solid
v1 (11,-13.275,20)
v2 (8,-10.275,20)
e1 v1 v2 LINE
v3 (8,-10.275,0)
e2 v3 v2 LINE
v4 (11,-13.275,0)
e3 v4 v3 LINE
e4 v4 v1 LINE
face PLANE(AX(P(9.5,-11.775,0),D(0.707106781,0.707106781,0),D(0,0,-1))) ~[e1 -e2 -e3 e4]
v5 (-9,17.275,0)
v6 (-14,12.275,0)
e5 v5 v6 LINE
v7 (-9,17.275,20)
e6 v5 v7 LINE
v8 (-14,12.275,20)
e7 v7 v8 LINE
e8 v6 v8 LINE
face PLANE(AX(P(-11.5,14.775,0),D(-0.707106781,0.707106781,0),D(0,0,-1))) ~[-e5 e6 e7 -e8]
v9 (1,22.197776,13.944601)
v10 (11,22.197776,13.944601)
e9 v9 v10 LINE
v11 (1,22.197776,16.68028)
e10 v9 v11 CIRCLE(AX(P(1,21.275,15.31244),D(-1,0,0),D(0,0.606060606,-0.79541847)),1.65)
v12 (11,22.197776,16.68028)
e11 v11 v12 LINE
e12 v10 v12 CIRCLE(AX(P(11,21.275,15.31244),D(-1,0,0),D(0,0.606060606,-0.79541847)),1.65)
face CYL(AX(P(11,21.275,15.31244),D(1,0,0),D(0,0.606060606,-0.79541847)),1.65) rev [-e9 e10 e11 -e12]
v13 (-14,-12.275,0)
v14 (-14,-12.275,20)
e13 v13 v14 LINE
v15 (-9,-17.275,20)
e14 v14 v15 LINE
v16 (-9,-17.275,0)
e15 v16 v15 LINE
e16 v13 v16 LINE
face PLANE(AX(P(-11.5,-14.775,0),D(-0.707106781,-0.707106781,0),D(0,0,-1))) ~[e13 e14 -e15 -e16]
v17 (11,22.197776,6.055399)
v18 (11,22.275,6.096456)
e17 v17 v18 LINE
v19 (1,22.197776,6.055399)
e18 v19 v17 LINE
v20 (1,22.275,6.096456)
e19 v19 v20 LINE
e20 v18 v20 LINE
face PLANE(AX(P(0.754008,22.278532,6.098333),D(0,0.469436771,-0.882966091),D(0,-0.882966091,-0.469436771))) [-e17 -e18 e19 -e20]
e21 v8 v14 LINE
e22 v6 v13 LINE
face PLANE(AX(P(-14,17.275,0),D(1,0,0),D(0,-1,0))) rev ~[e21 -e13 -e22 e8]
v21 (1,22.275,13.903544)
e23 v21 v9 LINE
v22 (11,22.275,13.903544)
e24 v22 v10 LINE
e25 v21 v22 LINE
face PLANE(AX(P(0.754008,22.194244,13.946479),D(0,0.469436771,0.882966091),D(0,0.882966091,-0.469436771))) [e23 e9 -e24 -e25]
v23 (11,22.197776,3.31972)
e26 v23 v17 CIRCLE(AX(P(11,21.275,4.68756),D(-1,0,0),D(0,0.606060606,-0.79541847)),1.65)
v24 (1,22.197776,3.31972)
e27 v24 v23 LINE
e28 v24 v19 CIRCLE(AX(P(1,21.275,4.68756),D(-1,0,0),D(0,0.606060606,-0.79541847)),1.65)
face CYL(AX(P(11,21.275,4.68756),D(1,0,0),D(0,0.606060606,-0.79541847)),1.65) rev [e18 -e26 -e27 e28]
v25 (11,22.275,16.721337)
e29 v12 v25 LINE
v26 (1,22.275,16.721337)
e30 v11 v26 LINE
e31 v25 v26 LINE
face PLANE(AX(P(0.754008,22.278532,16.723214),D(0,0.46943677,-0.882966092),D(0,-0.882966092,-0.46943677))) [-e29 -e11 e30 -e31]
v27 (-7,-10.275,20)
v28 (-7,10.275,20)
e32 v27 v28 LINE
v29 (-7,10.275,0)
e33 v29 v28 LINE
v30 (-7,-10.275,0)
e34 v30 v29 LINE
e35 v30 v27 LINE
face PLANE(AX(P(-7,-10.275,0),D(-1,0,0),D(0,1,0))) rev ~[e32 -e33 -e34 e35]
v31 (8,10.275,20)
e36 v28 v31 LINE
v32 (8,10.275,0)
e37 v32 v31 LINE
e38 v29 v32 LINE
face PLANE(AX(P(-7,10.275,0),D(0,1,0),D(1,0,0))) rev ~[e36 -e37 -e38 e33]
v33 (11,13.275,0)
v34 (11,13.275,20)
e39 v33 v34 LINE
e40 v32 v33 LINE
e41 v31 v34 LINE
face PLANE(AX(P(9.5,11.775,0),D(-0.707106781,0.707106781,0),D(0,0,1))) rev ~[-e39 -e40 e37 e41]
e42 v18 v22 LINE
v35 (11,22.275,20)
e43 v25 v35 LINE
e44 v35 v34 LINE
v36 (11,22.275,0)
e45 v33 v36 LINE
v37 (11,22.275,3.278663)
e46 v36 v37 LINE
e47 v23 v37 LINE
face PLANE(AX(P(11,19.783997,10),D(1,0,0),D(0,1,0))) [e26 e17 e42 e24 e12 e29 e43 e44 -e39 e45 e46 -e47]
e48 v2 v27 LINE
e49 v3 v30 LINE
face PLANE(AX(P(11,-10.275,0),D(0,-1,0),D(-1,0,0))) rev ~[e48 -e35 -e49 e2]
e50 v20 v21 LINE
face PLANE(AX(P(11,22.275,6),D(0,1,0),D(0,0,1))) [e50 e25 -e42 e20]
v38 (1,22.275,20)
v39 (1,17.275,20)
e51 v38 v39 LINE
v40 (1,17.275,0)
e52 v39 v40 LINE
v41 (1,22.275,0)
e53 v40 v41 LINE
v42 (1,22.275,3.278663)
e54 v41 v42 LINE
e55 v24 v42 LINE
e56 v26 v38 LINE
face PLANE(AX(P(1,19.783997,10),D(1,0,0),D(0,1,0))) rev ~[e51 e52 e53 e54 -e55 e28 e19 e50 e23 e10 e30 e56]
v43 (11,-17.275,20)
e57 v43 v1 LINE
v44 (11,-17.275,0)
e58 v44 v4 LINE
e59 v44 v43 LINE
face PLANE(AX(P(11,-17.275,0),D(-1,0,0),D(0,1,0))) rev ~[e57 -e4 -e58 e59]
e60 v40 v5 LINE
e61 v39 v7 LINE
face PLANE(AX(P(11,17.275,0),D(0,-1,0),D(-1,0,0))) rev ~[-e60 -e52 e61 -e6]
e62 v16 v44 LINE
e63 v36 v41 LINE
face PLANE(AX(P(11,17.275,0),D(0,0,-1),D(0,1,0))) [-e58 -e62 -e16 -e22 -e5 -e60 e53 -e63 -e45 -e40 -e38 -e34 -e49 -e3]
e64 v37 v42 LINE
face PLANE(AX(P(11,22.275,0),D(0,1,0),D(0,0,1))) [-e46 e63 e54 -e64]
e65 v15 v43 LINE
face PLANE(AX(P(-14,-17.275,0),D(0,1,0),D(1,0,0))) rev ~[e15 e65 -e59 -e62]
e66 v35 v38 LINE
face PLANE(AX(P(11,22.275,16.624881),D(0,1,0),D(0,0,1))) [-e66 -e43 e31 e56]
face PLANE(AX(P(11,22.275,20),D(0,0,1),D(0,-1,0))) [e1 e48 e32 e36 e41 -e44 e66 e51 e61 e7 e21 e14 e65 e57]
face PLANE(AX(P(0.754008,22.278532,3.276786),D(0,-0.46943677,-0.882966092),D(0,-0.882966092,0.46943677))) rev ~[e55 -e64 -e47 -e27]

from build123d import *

# Parameters (mm, degrees)
F1_DEPTH    = 20
F3_DEPTH    = 10
F4_SIZE     = 3
F5_T1_DEPTH = 10.4919836734
F6_SIZE     = 5


# Not quite as in the source:
# - a fillet or chamfer that OpenCascade refuses, or shapes differently, is made with other operations: its cross-section is extruded or revolved along the edge and cut away or added


with BuildPart() as f1:
    # F0 (on Top) → F1 (new body)
    with BuildSketch(Plane.XY):
        Polygon((11, 17.275), (-14, 17.275), (-14, -17.275), (11, -17.275), (11, -10.275), (-7, -10.275), (-7, 10.275), (11, 10.275), align=None)
    extrude(amount=F1_DEPTH)

    # F2 (on face) → F3 (join)
    with BuildSketch(Plane.YZ.offset(11)):
        with BuildLine():
            ThreePointArc((22.275, 14), (19.625, 15.3124404748), (22.275, 16.6248809497))
            Line((22.275, 16.6248809497), (22.275, 20))
            Line((22.275, 20), (17.275, 20))
            Line((17.275, 20), (17.275, 0))
            Line((17.275, 0), (22.275, 0))
            Line((22.275, 0), (22.275, 3.3751190503))
            ThreePointArc((22.275, 3.3751190503), (19.625, 4.6875595252), (22.275, 6))
            Line((22.275, 6), (22.275, 14))
        make_face()
    extrude(amount=-F3_DEPTH)

    # F4
    f4_edges = [f1.edges().sort_by_distance(p)[0] for p in [
        (11, 10.275, 10),
        (11, -10.275, 10),
    ]]
    chamfer(f4_edges, length=F4_SIZE)

    # F5: chamfer of 0.1 on 4 edges, made by hand

    # F5_s2 → F5_t1 (cut)
    with BuildSketch(Plane.YZ.offset(0.7540081633)):
        with BuildLine():
            Line((22.2785318644, 16.7232142773), (22.1942442254, 16.6784020049))
            Line((22.1942442254, 16.6784020049), (22.193125709, 16.6767440179))
            ThreePointArc((22.193125709, 16.6767440179), (22.2348996139, 16.6520287441), (22.2737878788, 16.6232901127))
            Line((22.2737878788, 16.6232901127), (22.277, 16.6248809497))
            ThreePointArc((22.277, 16.6248809497), (22.277, 16.6740476135), (22.2805318644, 16.7232142773))
            Line((22.2805318644, 16.7232142773), (22.2785318644, 16.7232142773))
        make_face()
        with BuildLine():
            Line((22.1942442254, 13.9464789448), (22.2785318644, 13.9016666723))
            Line((22.2785318644, 13.9016666723), (22.2805318644, 13.9016666723))
            ThreePointArc((22.2805318644, 13.9016666723), (22.277, 13.9508333362), (22.277, 14))
            Line((22.277, 14), (22.2737878788, 14.0015908369))
            ThreePointArc((22.2737878788, 14.0015908369), (22.2348996139, 13.9728522055), (22.193125709, 13.9481369318))
            Line((22.193125709, 13.9481369318), (22.1942442254, 13.9464789448))
        make_face()
        with BuildLine():
            Line((22.2785318644, 6.0983333277), (22.1942442254, 6.0535210552))
            Line((22.1942442254, 6.0535210552), (22.193125709, 6.0518630682))
            ThreePointArc((22.193125709, 6.0518630682), (22.2348996139, 6.0271477945), (22.2737878788, 5.9984091631))
            Line((22.2737878788, 5.9984091631), (22.277, 6))
            ThreePointArc((22.277, 6), (22.277, 6.0491666638), (22.2805318644, 6.0983333277))
            Line((22.2805318644, 6.0983333277), (22.2785318644, 6.0983333277))
        make_face()
        with BuildLine():
            Line((22.2785318644, 3.2767857227), (22.1942442254, 3.3215979951))
            Line((22.1942442254, 3.3215979951), (22.193125709, 3.3232559821))
            ThreePointArc((22.193125709, 3.3232559821), (22.2348996139, 3.3479712559), (22.2737878788, 3.3767098873))
            Line((22.2737878788, 3.3767098873), (22.277, 3.3751190503))
            ThreePointArc((22.277, 3.3751190503), (22.277, 3.3259523865), (22.2805318644, 3.2767857227))
            Line((22.2805318644, 3.2767857227), (22.2785318644, 3.2767857227))
        make_face()
    extrude(amount=F5_T1_DEPTH, mode=Mode.SUBTRACT)

    # F6
    f6_edges = [f1.edges().sort_by_distance(p)[0] for p in [
        (-14, 17.275, 10),
        (-14, -17.275, 10),
    ]]
    chamfer(f6_edges, length=F6_SIZE)


solid = f1.part
